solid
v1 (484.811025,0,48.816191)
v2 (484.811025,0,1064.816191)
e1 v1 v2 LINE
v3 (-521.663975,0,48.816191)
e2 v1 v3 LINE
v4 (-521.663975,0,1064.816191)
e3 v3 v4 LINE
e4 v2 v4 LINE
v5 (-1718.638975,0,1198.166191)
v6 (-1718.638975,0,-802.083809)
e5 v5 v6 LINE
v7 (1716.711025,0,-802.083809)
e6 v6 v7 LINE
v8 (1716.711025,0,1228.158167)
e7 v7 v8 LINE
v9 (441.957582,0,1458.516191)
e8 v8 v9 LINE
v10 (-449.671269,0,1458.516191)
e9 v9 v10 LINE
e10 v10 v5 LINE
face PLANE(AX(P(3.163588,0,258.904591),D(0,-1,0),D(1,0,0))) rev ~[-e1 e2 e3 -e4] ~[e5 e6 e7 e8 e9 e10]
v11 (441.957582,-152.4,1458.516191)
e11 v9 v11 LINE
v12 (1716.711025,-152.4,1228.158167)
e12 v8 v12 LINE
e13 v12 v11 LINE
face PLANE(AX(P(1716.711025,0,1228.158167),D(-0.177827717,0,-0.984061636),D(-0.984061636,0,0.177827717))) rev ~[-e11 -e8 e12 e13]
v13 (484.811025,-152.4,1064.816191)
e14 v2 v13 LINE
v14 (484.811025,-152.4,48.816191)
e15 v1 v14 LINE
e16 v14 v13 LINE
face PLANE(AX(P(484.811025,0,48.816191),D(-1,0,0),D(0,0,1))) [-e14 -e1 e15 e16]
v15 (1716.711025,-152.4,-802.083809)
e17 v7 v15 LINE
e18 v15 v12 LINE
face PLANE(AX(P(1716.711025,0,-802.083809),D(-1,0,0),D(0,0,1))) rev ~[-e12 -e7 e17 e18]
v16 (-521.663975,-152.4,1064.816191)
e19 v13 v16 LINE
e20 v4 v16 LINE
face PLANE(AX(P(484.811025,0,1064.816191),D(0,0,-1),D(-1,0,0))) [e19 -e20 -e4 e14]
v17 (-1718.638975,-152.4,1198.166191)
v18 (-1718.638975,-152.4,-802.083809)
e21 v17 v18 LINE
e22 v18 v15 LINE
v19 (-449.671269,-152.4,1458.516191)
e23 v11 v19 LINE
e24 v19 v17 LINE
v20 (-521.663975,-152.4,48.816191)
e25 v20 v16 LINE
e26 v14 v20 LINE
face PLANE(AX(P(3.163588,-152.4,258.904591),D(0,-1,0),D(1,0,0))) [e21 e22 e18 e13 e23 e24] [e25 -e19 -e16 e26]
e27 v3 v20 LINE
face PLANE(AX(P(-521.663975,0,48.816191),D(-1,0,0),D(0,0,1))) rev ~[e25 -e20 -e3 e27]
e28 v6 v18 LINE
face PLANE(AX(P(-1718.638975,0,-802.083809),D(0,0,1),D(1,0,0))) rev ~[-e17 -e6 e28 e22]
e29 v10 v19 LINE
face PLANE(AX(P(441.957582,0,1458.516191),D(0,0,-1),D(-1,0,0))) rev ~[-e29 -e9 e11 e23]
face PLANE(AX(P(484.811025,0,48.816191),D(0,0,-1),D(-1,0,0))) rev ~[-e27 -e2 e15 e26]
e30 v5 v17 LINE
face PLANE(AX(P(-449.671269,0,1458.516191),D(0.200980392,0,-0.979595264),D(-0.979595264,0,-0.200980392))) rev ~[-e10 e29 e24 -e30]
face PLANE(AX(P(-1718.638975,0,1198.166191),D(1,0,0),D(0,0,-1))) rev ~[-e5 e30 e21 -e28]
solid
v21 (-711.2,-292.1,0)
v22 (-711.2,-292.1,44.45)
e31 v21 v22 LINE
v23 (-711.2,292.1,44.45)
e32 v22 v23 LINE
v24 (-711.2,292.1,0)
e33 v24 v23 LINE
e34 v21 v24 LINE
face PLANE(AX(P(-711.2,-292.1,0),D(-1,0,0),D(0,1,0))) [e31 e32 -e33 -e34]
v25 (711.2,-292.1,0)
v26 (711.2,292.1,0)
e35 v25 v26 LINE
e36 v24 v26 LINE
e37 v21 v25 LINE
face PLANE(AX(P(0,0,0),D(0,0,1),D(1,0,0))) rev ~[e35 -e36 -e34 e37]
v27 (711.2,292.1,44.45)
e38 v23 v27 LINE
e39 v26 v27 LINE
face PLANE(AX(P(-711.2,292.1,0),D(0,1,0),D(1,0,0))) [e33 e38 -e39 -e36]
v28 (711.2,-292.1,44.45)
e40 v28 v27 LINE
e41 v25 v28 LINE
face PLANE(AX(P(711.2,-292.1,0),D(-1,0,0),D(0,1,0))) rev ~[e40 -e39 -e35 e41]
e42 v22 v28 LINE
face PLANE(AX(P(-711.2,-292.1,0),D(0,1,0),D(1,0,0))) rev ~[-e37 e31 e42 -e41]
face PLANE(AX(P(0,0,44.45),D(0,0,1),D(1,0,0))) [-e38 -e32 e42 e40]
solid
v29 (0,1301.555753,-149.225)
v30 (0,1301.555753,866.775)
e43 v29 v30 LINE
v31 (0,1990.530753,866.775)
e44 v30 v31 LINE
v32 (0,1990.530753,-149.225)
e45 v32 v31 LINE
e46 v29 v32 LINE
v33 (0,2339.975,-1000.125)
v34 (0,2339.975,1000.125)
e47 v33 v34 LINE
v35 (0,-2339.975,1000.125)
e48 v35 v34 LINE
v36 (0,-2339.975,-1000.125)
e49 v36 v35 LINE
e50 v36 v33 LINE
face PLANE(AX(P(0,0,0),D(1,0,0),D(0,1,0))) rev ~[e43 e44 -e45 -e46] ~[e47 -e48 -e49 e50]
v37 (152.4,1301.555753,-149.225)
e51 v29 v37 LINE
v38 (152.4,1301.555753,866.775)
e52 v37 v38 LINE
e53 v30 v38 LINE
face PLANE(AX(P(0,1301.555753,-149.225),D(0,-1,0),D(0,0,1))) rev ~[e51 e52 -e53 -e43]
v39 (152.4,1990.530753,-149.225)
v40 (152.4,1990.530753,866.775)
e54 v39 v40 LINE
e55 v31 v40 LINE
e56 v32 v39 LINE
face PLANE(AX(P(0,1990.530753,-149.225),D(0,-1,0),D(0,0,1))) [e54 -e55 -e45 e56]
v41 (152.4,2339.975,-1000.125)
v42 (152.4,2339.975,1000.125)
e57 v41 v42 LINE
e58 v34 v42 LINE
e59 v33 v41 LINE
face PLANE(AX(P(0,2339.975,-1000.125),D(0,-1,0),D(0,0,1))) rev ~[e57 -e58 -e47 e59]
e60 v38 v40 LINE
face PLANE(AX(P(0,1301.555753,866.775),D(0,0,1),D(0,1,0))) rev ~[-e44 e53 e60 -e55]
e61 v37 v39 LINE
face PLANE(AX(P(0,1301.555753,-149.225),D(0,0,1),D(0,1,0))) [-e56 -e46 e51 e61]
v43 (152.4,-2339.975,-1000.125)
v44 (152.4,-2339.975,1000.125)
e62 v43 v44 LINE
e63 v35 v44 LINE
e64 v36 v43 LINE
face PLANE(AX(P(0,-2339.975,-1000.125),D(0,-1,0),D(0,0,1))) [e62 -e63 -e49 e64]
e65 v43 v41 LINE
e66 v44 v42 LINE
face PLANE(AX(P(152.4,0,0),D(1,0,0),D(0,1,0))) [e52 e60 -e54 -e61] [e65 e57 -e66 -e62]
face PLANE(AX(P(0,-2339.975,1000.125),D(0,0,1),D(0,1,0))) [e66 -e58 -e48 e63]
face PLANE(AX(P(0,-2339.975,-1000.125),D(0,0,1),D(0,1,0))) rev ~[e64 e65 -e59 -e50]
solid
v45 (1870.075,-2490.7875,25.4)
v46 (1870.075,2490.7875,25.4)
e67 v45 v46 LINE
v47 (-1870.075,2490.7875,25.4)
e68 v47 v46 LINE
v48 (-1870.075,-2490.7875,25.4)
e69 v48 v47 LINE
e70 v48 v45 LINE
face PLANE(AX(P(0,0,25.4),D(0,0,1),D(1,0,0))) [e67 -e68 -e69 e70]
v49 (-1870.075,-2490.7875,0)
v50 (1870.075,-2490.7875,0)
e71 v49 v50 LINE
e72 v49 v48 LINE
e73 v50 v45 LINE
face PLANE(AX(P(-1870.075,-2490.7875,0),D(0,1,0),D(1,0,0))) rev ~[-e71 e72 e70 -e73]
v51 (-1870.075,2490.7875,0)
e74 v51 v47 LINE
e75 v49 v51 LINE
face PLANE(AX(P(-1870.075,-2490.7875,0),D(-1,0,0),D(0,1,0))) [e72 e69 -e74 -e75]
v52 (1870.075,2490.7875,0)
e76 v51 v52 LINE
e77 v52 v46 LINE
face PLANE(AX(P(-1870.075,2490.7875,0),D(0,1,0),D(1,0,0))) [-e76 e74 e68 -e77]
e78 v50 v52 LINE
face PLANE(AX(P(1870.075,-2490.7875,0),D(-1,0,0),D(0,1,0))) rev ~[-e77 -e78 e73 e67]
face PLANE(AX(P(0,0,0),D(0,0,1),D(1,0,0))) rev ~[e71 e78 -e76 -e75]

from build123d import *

# Parameters (mm, degrees)
F0_W     = 3740.15
F0_H     = 4981.575
F1_DEPTH = 25.4
F2_W     = 4679.95
F2_H     = 2000.25
F2_W_2   = 688.975
F2_H_2   = 1016
F3_DEPTH = 152.4
F5_DEPTH = 152.4
F6_W     = 1006.475
F6_H     = 1016
F7_DEPTH = 152.4
F8_W     = 1422.4
F8_H     = 584.2
F9_DEPTH = 44.45


# Not quite as in the source:
# - a feature names something its author has since deleted; it is built from what else it names


with BuildPart() as f1:
    # F0 (on Top) → F1 (new body)
    with BuildSketch(Plane.XY):
        Rectangle(F0_W, F0_H)
    extrude(amount=F1_DEPTH)


with BuildPart() as f3:
    # F2 (on Right) → F3 (new body)
    with BuildSketch(Plane.YZ):
        Rectangle(F2_W, F2_H)
        with Locations((1646.0432527542, 358.775)):
            Rectangle(F2_W_2, F2_H_2, mode=Mode.SUBTRACT)
    extrude(amount=F3_DEPTH)


with BuildPart() as f5:
    # F4 (on Front) → F5 (new body)
    with BuildSketch(Plane.XZ):
        Polygon((-1718.6389747441, -802.0838088955), (1716.7110252559, -802.0838088955), (1716.7110252559, 1228.1581670422), (441.9575821344, 1458.5161911045), (-449.6712692842, 1458.5161911045), (-1718.6389747441, 1198.1661911045), align=None)
    extrude(amount=F5_DEPTH)

    # F6 (on face) → F7 (cut)
    with BuildSketch(Plane(origin=(0, 0, 0), x_dir=(-1, 0, 0), z_dir=(0, 1, 0))):
        with Locations((18.4264747441, 556.8161911045)):
            Rectangle(F6_W, F6_H)
    extrude(amount=-F7_DEPTH, mode=Mode.SUBTRACT)


with BuildPart() as f9:
    # F8 (on Top) → F9 (new body)
    with BuildSketch(Plane.XY):
        Rectangle(F8_W, F8_H)
    extrude(amount=F9_DEPTH)


solid = Compound([f1.part, f3.part, f5.part, f9.part])
